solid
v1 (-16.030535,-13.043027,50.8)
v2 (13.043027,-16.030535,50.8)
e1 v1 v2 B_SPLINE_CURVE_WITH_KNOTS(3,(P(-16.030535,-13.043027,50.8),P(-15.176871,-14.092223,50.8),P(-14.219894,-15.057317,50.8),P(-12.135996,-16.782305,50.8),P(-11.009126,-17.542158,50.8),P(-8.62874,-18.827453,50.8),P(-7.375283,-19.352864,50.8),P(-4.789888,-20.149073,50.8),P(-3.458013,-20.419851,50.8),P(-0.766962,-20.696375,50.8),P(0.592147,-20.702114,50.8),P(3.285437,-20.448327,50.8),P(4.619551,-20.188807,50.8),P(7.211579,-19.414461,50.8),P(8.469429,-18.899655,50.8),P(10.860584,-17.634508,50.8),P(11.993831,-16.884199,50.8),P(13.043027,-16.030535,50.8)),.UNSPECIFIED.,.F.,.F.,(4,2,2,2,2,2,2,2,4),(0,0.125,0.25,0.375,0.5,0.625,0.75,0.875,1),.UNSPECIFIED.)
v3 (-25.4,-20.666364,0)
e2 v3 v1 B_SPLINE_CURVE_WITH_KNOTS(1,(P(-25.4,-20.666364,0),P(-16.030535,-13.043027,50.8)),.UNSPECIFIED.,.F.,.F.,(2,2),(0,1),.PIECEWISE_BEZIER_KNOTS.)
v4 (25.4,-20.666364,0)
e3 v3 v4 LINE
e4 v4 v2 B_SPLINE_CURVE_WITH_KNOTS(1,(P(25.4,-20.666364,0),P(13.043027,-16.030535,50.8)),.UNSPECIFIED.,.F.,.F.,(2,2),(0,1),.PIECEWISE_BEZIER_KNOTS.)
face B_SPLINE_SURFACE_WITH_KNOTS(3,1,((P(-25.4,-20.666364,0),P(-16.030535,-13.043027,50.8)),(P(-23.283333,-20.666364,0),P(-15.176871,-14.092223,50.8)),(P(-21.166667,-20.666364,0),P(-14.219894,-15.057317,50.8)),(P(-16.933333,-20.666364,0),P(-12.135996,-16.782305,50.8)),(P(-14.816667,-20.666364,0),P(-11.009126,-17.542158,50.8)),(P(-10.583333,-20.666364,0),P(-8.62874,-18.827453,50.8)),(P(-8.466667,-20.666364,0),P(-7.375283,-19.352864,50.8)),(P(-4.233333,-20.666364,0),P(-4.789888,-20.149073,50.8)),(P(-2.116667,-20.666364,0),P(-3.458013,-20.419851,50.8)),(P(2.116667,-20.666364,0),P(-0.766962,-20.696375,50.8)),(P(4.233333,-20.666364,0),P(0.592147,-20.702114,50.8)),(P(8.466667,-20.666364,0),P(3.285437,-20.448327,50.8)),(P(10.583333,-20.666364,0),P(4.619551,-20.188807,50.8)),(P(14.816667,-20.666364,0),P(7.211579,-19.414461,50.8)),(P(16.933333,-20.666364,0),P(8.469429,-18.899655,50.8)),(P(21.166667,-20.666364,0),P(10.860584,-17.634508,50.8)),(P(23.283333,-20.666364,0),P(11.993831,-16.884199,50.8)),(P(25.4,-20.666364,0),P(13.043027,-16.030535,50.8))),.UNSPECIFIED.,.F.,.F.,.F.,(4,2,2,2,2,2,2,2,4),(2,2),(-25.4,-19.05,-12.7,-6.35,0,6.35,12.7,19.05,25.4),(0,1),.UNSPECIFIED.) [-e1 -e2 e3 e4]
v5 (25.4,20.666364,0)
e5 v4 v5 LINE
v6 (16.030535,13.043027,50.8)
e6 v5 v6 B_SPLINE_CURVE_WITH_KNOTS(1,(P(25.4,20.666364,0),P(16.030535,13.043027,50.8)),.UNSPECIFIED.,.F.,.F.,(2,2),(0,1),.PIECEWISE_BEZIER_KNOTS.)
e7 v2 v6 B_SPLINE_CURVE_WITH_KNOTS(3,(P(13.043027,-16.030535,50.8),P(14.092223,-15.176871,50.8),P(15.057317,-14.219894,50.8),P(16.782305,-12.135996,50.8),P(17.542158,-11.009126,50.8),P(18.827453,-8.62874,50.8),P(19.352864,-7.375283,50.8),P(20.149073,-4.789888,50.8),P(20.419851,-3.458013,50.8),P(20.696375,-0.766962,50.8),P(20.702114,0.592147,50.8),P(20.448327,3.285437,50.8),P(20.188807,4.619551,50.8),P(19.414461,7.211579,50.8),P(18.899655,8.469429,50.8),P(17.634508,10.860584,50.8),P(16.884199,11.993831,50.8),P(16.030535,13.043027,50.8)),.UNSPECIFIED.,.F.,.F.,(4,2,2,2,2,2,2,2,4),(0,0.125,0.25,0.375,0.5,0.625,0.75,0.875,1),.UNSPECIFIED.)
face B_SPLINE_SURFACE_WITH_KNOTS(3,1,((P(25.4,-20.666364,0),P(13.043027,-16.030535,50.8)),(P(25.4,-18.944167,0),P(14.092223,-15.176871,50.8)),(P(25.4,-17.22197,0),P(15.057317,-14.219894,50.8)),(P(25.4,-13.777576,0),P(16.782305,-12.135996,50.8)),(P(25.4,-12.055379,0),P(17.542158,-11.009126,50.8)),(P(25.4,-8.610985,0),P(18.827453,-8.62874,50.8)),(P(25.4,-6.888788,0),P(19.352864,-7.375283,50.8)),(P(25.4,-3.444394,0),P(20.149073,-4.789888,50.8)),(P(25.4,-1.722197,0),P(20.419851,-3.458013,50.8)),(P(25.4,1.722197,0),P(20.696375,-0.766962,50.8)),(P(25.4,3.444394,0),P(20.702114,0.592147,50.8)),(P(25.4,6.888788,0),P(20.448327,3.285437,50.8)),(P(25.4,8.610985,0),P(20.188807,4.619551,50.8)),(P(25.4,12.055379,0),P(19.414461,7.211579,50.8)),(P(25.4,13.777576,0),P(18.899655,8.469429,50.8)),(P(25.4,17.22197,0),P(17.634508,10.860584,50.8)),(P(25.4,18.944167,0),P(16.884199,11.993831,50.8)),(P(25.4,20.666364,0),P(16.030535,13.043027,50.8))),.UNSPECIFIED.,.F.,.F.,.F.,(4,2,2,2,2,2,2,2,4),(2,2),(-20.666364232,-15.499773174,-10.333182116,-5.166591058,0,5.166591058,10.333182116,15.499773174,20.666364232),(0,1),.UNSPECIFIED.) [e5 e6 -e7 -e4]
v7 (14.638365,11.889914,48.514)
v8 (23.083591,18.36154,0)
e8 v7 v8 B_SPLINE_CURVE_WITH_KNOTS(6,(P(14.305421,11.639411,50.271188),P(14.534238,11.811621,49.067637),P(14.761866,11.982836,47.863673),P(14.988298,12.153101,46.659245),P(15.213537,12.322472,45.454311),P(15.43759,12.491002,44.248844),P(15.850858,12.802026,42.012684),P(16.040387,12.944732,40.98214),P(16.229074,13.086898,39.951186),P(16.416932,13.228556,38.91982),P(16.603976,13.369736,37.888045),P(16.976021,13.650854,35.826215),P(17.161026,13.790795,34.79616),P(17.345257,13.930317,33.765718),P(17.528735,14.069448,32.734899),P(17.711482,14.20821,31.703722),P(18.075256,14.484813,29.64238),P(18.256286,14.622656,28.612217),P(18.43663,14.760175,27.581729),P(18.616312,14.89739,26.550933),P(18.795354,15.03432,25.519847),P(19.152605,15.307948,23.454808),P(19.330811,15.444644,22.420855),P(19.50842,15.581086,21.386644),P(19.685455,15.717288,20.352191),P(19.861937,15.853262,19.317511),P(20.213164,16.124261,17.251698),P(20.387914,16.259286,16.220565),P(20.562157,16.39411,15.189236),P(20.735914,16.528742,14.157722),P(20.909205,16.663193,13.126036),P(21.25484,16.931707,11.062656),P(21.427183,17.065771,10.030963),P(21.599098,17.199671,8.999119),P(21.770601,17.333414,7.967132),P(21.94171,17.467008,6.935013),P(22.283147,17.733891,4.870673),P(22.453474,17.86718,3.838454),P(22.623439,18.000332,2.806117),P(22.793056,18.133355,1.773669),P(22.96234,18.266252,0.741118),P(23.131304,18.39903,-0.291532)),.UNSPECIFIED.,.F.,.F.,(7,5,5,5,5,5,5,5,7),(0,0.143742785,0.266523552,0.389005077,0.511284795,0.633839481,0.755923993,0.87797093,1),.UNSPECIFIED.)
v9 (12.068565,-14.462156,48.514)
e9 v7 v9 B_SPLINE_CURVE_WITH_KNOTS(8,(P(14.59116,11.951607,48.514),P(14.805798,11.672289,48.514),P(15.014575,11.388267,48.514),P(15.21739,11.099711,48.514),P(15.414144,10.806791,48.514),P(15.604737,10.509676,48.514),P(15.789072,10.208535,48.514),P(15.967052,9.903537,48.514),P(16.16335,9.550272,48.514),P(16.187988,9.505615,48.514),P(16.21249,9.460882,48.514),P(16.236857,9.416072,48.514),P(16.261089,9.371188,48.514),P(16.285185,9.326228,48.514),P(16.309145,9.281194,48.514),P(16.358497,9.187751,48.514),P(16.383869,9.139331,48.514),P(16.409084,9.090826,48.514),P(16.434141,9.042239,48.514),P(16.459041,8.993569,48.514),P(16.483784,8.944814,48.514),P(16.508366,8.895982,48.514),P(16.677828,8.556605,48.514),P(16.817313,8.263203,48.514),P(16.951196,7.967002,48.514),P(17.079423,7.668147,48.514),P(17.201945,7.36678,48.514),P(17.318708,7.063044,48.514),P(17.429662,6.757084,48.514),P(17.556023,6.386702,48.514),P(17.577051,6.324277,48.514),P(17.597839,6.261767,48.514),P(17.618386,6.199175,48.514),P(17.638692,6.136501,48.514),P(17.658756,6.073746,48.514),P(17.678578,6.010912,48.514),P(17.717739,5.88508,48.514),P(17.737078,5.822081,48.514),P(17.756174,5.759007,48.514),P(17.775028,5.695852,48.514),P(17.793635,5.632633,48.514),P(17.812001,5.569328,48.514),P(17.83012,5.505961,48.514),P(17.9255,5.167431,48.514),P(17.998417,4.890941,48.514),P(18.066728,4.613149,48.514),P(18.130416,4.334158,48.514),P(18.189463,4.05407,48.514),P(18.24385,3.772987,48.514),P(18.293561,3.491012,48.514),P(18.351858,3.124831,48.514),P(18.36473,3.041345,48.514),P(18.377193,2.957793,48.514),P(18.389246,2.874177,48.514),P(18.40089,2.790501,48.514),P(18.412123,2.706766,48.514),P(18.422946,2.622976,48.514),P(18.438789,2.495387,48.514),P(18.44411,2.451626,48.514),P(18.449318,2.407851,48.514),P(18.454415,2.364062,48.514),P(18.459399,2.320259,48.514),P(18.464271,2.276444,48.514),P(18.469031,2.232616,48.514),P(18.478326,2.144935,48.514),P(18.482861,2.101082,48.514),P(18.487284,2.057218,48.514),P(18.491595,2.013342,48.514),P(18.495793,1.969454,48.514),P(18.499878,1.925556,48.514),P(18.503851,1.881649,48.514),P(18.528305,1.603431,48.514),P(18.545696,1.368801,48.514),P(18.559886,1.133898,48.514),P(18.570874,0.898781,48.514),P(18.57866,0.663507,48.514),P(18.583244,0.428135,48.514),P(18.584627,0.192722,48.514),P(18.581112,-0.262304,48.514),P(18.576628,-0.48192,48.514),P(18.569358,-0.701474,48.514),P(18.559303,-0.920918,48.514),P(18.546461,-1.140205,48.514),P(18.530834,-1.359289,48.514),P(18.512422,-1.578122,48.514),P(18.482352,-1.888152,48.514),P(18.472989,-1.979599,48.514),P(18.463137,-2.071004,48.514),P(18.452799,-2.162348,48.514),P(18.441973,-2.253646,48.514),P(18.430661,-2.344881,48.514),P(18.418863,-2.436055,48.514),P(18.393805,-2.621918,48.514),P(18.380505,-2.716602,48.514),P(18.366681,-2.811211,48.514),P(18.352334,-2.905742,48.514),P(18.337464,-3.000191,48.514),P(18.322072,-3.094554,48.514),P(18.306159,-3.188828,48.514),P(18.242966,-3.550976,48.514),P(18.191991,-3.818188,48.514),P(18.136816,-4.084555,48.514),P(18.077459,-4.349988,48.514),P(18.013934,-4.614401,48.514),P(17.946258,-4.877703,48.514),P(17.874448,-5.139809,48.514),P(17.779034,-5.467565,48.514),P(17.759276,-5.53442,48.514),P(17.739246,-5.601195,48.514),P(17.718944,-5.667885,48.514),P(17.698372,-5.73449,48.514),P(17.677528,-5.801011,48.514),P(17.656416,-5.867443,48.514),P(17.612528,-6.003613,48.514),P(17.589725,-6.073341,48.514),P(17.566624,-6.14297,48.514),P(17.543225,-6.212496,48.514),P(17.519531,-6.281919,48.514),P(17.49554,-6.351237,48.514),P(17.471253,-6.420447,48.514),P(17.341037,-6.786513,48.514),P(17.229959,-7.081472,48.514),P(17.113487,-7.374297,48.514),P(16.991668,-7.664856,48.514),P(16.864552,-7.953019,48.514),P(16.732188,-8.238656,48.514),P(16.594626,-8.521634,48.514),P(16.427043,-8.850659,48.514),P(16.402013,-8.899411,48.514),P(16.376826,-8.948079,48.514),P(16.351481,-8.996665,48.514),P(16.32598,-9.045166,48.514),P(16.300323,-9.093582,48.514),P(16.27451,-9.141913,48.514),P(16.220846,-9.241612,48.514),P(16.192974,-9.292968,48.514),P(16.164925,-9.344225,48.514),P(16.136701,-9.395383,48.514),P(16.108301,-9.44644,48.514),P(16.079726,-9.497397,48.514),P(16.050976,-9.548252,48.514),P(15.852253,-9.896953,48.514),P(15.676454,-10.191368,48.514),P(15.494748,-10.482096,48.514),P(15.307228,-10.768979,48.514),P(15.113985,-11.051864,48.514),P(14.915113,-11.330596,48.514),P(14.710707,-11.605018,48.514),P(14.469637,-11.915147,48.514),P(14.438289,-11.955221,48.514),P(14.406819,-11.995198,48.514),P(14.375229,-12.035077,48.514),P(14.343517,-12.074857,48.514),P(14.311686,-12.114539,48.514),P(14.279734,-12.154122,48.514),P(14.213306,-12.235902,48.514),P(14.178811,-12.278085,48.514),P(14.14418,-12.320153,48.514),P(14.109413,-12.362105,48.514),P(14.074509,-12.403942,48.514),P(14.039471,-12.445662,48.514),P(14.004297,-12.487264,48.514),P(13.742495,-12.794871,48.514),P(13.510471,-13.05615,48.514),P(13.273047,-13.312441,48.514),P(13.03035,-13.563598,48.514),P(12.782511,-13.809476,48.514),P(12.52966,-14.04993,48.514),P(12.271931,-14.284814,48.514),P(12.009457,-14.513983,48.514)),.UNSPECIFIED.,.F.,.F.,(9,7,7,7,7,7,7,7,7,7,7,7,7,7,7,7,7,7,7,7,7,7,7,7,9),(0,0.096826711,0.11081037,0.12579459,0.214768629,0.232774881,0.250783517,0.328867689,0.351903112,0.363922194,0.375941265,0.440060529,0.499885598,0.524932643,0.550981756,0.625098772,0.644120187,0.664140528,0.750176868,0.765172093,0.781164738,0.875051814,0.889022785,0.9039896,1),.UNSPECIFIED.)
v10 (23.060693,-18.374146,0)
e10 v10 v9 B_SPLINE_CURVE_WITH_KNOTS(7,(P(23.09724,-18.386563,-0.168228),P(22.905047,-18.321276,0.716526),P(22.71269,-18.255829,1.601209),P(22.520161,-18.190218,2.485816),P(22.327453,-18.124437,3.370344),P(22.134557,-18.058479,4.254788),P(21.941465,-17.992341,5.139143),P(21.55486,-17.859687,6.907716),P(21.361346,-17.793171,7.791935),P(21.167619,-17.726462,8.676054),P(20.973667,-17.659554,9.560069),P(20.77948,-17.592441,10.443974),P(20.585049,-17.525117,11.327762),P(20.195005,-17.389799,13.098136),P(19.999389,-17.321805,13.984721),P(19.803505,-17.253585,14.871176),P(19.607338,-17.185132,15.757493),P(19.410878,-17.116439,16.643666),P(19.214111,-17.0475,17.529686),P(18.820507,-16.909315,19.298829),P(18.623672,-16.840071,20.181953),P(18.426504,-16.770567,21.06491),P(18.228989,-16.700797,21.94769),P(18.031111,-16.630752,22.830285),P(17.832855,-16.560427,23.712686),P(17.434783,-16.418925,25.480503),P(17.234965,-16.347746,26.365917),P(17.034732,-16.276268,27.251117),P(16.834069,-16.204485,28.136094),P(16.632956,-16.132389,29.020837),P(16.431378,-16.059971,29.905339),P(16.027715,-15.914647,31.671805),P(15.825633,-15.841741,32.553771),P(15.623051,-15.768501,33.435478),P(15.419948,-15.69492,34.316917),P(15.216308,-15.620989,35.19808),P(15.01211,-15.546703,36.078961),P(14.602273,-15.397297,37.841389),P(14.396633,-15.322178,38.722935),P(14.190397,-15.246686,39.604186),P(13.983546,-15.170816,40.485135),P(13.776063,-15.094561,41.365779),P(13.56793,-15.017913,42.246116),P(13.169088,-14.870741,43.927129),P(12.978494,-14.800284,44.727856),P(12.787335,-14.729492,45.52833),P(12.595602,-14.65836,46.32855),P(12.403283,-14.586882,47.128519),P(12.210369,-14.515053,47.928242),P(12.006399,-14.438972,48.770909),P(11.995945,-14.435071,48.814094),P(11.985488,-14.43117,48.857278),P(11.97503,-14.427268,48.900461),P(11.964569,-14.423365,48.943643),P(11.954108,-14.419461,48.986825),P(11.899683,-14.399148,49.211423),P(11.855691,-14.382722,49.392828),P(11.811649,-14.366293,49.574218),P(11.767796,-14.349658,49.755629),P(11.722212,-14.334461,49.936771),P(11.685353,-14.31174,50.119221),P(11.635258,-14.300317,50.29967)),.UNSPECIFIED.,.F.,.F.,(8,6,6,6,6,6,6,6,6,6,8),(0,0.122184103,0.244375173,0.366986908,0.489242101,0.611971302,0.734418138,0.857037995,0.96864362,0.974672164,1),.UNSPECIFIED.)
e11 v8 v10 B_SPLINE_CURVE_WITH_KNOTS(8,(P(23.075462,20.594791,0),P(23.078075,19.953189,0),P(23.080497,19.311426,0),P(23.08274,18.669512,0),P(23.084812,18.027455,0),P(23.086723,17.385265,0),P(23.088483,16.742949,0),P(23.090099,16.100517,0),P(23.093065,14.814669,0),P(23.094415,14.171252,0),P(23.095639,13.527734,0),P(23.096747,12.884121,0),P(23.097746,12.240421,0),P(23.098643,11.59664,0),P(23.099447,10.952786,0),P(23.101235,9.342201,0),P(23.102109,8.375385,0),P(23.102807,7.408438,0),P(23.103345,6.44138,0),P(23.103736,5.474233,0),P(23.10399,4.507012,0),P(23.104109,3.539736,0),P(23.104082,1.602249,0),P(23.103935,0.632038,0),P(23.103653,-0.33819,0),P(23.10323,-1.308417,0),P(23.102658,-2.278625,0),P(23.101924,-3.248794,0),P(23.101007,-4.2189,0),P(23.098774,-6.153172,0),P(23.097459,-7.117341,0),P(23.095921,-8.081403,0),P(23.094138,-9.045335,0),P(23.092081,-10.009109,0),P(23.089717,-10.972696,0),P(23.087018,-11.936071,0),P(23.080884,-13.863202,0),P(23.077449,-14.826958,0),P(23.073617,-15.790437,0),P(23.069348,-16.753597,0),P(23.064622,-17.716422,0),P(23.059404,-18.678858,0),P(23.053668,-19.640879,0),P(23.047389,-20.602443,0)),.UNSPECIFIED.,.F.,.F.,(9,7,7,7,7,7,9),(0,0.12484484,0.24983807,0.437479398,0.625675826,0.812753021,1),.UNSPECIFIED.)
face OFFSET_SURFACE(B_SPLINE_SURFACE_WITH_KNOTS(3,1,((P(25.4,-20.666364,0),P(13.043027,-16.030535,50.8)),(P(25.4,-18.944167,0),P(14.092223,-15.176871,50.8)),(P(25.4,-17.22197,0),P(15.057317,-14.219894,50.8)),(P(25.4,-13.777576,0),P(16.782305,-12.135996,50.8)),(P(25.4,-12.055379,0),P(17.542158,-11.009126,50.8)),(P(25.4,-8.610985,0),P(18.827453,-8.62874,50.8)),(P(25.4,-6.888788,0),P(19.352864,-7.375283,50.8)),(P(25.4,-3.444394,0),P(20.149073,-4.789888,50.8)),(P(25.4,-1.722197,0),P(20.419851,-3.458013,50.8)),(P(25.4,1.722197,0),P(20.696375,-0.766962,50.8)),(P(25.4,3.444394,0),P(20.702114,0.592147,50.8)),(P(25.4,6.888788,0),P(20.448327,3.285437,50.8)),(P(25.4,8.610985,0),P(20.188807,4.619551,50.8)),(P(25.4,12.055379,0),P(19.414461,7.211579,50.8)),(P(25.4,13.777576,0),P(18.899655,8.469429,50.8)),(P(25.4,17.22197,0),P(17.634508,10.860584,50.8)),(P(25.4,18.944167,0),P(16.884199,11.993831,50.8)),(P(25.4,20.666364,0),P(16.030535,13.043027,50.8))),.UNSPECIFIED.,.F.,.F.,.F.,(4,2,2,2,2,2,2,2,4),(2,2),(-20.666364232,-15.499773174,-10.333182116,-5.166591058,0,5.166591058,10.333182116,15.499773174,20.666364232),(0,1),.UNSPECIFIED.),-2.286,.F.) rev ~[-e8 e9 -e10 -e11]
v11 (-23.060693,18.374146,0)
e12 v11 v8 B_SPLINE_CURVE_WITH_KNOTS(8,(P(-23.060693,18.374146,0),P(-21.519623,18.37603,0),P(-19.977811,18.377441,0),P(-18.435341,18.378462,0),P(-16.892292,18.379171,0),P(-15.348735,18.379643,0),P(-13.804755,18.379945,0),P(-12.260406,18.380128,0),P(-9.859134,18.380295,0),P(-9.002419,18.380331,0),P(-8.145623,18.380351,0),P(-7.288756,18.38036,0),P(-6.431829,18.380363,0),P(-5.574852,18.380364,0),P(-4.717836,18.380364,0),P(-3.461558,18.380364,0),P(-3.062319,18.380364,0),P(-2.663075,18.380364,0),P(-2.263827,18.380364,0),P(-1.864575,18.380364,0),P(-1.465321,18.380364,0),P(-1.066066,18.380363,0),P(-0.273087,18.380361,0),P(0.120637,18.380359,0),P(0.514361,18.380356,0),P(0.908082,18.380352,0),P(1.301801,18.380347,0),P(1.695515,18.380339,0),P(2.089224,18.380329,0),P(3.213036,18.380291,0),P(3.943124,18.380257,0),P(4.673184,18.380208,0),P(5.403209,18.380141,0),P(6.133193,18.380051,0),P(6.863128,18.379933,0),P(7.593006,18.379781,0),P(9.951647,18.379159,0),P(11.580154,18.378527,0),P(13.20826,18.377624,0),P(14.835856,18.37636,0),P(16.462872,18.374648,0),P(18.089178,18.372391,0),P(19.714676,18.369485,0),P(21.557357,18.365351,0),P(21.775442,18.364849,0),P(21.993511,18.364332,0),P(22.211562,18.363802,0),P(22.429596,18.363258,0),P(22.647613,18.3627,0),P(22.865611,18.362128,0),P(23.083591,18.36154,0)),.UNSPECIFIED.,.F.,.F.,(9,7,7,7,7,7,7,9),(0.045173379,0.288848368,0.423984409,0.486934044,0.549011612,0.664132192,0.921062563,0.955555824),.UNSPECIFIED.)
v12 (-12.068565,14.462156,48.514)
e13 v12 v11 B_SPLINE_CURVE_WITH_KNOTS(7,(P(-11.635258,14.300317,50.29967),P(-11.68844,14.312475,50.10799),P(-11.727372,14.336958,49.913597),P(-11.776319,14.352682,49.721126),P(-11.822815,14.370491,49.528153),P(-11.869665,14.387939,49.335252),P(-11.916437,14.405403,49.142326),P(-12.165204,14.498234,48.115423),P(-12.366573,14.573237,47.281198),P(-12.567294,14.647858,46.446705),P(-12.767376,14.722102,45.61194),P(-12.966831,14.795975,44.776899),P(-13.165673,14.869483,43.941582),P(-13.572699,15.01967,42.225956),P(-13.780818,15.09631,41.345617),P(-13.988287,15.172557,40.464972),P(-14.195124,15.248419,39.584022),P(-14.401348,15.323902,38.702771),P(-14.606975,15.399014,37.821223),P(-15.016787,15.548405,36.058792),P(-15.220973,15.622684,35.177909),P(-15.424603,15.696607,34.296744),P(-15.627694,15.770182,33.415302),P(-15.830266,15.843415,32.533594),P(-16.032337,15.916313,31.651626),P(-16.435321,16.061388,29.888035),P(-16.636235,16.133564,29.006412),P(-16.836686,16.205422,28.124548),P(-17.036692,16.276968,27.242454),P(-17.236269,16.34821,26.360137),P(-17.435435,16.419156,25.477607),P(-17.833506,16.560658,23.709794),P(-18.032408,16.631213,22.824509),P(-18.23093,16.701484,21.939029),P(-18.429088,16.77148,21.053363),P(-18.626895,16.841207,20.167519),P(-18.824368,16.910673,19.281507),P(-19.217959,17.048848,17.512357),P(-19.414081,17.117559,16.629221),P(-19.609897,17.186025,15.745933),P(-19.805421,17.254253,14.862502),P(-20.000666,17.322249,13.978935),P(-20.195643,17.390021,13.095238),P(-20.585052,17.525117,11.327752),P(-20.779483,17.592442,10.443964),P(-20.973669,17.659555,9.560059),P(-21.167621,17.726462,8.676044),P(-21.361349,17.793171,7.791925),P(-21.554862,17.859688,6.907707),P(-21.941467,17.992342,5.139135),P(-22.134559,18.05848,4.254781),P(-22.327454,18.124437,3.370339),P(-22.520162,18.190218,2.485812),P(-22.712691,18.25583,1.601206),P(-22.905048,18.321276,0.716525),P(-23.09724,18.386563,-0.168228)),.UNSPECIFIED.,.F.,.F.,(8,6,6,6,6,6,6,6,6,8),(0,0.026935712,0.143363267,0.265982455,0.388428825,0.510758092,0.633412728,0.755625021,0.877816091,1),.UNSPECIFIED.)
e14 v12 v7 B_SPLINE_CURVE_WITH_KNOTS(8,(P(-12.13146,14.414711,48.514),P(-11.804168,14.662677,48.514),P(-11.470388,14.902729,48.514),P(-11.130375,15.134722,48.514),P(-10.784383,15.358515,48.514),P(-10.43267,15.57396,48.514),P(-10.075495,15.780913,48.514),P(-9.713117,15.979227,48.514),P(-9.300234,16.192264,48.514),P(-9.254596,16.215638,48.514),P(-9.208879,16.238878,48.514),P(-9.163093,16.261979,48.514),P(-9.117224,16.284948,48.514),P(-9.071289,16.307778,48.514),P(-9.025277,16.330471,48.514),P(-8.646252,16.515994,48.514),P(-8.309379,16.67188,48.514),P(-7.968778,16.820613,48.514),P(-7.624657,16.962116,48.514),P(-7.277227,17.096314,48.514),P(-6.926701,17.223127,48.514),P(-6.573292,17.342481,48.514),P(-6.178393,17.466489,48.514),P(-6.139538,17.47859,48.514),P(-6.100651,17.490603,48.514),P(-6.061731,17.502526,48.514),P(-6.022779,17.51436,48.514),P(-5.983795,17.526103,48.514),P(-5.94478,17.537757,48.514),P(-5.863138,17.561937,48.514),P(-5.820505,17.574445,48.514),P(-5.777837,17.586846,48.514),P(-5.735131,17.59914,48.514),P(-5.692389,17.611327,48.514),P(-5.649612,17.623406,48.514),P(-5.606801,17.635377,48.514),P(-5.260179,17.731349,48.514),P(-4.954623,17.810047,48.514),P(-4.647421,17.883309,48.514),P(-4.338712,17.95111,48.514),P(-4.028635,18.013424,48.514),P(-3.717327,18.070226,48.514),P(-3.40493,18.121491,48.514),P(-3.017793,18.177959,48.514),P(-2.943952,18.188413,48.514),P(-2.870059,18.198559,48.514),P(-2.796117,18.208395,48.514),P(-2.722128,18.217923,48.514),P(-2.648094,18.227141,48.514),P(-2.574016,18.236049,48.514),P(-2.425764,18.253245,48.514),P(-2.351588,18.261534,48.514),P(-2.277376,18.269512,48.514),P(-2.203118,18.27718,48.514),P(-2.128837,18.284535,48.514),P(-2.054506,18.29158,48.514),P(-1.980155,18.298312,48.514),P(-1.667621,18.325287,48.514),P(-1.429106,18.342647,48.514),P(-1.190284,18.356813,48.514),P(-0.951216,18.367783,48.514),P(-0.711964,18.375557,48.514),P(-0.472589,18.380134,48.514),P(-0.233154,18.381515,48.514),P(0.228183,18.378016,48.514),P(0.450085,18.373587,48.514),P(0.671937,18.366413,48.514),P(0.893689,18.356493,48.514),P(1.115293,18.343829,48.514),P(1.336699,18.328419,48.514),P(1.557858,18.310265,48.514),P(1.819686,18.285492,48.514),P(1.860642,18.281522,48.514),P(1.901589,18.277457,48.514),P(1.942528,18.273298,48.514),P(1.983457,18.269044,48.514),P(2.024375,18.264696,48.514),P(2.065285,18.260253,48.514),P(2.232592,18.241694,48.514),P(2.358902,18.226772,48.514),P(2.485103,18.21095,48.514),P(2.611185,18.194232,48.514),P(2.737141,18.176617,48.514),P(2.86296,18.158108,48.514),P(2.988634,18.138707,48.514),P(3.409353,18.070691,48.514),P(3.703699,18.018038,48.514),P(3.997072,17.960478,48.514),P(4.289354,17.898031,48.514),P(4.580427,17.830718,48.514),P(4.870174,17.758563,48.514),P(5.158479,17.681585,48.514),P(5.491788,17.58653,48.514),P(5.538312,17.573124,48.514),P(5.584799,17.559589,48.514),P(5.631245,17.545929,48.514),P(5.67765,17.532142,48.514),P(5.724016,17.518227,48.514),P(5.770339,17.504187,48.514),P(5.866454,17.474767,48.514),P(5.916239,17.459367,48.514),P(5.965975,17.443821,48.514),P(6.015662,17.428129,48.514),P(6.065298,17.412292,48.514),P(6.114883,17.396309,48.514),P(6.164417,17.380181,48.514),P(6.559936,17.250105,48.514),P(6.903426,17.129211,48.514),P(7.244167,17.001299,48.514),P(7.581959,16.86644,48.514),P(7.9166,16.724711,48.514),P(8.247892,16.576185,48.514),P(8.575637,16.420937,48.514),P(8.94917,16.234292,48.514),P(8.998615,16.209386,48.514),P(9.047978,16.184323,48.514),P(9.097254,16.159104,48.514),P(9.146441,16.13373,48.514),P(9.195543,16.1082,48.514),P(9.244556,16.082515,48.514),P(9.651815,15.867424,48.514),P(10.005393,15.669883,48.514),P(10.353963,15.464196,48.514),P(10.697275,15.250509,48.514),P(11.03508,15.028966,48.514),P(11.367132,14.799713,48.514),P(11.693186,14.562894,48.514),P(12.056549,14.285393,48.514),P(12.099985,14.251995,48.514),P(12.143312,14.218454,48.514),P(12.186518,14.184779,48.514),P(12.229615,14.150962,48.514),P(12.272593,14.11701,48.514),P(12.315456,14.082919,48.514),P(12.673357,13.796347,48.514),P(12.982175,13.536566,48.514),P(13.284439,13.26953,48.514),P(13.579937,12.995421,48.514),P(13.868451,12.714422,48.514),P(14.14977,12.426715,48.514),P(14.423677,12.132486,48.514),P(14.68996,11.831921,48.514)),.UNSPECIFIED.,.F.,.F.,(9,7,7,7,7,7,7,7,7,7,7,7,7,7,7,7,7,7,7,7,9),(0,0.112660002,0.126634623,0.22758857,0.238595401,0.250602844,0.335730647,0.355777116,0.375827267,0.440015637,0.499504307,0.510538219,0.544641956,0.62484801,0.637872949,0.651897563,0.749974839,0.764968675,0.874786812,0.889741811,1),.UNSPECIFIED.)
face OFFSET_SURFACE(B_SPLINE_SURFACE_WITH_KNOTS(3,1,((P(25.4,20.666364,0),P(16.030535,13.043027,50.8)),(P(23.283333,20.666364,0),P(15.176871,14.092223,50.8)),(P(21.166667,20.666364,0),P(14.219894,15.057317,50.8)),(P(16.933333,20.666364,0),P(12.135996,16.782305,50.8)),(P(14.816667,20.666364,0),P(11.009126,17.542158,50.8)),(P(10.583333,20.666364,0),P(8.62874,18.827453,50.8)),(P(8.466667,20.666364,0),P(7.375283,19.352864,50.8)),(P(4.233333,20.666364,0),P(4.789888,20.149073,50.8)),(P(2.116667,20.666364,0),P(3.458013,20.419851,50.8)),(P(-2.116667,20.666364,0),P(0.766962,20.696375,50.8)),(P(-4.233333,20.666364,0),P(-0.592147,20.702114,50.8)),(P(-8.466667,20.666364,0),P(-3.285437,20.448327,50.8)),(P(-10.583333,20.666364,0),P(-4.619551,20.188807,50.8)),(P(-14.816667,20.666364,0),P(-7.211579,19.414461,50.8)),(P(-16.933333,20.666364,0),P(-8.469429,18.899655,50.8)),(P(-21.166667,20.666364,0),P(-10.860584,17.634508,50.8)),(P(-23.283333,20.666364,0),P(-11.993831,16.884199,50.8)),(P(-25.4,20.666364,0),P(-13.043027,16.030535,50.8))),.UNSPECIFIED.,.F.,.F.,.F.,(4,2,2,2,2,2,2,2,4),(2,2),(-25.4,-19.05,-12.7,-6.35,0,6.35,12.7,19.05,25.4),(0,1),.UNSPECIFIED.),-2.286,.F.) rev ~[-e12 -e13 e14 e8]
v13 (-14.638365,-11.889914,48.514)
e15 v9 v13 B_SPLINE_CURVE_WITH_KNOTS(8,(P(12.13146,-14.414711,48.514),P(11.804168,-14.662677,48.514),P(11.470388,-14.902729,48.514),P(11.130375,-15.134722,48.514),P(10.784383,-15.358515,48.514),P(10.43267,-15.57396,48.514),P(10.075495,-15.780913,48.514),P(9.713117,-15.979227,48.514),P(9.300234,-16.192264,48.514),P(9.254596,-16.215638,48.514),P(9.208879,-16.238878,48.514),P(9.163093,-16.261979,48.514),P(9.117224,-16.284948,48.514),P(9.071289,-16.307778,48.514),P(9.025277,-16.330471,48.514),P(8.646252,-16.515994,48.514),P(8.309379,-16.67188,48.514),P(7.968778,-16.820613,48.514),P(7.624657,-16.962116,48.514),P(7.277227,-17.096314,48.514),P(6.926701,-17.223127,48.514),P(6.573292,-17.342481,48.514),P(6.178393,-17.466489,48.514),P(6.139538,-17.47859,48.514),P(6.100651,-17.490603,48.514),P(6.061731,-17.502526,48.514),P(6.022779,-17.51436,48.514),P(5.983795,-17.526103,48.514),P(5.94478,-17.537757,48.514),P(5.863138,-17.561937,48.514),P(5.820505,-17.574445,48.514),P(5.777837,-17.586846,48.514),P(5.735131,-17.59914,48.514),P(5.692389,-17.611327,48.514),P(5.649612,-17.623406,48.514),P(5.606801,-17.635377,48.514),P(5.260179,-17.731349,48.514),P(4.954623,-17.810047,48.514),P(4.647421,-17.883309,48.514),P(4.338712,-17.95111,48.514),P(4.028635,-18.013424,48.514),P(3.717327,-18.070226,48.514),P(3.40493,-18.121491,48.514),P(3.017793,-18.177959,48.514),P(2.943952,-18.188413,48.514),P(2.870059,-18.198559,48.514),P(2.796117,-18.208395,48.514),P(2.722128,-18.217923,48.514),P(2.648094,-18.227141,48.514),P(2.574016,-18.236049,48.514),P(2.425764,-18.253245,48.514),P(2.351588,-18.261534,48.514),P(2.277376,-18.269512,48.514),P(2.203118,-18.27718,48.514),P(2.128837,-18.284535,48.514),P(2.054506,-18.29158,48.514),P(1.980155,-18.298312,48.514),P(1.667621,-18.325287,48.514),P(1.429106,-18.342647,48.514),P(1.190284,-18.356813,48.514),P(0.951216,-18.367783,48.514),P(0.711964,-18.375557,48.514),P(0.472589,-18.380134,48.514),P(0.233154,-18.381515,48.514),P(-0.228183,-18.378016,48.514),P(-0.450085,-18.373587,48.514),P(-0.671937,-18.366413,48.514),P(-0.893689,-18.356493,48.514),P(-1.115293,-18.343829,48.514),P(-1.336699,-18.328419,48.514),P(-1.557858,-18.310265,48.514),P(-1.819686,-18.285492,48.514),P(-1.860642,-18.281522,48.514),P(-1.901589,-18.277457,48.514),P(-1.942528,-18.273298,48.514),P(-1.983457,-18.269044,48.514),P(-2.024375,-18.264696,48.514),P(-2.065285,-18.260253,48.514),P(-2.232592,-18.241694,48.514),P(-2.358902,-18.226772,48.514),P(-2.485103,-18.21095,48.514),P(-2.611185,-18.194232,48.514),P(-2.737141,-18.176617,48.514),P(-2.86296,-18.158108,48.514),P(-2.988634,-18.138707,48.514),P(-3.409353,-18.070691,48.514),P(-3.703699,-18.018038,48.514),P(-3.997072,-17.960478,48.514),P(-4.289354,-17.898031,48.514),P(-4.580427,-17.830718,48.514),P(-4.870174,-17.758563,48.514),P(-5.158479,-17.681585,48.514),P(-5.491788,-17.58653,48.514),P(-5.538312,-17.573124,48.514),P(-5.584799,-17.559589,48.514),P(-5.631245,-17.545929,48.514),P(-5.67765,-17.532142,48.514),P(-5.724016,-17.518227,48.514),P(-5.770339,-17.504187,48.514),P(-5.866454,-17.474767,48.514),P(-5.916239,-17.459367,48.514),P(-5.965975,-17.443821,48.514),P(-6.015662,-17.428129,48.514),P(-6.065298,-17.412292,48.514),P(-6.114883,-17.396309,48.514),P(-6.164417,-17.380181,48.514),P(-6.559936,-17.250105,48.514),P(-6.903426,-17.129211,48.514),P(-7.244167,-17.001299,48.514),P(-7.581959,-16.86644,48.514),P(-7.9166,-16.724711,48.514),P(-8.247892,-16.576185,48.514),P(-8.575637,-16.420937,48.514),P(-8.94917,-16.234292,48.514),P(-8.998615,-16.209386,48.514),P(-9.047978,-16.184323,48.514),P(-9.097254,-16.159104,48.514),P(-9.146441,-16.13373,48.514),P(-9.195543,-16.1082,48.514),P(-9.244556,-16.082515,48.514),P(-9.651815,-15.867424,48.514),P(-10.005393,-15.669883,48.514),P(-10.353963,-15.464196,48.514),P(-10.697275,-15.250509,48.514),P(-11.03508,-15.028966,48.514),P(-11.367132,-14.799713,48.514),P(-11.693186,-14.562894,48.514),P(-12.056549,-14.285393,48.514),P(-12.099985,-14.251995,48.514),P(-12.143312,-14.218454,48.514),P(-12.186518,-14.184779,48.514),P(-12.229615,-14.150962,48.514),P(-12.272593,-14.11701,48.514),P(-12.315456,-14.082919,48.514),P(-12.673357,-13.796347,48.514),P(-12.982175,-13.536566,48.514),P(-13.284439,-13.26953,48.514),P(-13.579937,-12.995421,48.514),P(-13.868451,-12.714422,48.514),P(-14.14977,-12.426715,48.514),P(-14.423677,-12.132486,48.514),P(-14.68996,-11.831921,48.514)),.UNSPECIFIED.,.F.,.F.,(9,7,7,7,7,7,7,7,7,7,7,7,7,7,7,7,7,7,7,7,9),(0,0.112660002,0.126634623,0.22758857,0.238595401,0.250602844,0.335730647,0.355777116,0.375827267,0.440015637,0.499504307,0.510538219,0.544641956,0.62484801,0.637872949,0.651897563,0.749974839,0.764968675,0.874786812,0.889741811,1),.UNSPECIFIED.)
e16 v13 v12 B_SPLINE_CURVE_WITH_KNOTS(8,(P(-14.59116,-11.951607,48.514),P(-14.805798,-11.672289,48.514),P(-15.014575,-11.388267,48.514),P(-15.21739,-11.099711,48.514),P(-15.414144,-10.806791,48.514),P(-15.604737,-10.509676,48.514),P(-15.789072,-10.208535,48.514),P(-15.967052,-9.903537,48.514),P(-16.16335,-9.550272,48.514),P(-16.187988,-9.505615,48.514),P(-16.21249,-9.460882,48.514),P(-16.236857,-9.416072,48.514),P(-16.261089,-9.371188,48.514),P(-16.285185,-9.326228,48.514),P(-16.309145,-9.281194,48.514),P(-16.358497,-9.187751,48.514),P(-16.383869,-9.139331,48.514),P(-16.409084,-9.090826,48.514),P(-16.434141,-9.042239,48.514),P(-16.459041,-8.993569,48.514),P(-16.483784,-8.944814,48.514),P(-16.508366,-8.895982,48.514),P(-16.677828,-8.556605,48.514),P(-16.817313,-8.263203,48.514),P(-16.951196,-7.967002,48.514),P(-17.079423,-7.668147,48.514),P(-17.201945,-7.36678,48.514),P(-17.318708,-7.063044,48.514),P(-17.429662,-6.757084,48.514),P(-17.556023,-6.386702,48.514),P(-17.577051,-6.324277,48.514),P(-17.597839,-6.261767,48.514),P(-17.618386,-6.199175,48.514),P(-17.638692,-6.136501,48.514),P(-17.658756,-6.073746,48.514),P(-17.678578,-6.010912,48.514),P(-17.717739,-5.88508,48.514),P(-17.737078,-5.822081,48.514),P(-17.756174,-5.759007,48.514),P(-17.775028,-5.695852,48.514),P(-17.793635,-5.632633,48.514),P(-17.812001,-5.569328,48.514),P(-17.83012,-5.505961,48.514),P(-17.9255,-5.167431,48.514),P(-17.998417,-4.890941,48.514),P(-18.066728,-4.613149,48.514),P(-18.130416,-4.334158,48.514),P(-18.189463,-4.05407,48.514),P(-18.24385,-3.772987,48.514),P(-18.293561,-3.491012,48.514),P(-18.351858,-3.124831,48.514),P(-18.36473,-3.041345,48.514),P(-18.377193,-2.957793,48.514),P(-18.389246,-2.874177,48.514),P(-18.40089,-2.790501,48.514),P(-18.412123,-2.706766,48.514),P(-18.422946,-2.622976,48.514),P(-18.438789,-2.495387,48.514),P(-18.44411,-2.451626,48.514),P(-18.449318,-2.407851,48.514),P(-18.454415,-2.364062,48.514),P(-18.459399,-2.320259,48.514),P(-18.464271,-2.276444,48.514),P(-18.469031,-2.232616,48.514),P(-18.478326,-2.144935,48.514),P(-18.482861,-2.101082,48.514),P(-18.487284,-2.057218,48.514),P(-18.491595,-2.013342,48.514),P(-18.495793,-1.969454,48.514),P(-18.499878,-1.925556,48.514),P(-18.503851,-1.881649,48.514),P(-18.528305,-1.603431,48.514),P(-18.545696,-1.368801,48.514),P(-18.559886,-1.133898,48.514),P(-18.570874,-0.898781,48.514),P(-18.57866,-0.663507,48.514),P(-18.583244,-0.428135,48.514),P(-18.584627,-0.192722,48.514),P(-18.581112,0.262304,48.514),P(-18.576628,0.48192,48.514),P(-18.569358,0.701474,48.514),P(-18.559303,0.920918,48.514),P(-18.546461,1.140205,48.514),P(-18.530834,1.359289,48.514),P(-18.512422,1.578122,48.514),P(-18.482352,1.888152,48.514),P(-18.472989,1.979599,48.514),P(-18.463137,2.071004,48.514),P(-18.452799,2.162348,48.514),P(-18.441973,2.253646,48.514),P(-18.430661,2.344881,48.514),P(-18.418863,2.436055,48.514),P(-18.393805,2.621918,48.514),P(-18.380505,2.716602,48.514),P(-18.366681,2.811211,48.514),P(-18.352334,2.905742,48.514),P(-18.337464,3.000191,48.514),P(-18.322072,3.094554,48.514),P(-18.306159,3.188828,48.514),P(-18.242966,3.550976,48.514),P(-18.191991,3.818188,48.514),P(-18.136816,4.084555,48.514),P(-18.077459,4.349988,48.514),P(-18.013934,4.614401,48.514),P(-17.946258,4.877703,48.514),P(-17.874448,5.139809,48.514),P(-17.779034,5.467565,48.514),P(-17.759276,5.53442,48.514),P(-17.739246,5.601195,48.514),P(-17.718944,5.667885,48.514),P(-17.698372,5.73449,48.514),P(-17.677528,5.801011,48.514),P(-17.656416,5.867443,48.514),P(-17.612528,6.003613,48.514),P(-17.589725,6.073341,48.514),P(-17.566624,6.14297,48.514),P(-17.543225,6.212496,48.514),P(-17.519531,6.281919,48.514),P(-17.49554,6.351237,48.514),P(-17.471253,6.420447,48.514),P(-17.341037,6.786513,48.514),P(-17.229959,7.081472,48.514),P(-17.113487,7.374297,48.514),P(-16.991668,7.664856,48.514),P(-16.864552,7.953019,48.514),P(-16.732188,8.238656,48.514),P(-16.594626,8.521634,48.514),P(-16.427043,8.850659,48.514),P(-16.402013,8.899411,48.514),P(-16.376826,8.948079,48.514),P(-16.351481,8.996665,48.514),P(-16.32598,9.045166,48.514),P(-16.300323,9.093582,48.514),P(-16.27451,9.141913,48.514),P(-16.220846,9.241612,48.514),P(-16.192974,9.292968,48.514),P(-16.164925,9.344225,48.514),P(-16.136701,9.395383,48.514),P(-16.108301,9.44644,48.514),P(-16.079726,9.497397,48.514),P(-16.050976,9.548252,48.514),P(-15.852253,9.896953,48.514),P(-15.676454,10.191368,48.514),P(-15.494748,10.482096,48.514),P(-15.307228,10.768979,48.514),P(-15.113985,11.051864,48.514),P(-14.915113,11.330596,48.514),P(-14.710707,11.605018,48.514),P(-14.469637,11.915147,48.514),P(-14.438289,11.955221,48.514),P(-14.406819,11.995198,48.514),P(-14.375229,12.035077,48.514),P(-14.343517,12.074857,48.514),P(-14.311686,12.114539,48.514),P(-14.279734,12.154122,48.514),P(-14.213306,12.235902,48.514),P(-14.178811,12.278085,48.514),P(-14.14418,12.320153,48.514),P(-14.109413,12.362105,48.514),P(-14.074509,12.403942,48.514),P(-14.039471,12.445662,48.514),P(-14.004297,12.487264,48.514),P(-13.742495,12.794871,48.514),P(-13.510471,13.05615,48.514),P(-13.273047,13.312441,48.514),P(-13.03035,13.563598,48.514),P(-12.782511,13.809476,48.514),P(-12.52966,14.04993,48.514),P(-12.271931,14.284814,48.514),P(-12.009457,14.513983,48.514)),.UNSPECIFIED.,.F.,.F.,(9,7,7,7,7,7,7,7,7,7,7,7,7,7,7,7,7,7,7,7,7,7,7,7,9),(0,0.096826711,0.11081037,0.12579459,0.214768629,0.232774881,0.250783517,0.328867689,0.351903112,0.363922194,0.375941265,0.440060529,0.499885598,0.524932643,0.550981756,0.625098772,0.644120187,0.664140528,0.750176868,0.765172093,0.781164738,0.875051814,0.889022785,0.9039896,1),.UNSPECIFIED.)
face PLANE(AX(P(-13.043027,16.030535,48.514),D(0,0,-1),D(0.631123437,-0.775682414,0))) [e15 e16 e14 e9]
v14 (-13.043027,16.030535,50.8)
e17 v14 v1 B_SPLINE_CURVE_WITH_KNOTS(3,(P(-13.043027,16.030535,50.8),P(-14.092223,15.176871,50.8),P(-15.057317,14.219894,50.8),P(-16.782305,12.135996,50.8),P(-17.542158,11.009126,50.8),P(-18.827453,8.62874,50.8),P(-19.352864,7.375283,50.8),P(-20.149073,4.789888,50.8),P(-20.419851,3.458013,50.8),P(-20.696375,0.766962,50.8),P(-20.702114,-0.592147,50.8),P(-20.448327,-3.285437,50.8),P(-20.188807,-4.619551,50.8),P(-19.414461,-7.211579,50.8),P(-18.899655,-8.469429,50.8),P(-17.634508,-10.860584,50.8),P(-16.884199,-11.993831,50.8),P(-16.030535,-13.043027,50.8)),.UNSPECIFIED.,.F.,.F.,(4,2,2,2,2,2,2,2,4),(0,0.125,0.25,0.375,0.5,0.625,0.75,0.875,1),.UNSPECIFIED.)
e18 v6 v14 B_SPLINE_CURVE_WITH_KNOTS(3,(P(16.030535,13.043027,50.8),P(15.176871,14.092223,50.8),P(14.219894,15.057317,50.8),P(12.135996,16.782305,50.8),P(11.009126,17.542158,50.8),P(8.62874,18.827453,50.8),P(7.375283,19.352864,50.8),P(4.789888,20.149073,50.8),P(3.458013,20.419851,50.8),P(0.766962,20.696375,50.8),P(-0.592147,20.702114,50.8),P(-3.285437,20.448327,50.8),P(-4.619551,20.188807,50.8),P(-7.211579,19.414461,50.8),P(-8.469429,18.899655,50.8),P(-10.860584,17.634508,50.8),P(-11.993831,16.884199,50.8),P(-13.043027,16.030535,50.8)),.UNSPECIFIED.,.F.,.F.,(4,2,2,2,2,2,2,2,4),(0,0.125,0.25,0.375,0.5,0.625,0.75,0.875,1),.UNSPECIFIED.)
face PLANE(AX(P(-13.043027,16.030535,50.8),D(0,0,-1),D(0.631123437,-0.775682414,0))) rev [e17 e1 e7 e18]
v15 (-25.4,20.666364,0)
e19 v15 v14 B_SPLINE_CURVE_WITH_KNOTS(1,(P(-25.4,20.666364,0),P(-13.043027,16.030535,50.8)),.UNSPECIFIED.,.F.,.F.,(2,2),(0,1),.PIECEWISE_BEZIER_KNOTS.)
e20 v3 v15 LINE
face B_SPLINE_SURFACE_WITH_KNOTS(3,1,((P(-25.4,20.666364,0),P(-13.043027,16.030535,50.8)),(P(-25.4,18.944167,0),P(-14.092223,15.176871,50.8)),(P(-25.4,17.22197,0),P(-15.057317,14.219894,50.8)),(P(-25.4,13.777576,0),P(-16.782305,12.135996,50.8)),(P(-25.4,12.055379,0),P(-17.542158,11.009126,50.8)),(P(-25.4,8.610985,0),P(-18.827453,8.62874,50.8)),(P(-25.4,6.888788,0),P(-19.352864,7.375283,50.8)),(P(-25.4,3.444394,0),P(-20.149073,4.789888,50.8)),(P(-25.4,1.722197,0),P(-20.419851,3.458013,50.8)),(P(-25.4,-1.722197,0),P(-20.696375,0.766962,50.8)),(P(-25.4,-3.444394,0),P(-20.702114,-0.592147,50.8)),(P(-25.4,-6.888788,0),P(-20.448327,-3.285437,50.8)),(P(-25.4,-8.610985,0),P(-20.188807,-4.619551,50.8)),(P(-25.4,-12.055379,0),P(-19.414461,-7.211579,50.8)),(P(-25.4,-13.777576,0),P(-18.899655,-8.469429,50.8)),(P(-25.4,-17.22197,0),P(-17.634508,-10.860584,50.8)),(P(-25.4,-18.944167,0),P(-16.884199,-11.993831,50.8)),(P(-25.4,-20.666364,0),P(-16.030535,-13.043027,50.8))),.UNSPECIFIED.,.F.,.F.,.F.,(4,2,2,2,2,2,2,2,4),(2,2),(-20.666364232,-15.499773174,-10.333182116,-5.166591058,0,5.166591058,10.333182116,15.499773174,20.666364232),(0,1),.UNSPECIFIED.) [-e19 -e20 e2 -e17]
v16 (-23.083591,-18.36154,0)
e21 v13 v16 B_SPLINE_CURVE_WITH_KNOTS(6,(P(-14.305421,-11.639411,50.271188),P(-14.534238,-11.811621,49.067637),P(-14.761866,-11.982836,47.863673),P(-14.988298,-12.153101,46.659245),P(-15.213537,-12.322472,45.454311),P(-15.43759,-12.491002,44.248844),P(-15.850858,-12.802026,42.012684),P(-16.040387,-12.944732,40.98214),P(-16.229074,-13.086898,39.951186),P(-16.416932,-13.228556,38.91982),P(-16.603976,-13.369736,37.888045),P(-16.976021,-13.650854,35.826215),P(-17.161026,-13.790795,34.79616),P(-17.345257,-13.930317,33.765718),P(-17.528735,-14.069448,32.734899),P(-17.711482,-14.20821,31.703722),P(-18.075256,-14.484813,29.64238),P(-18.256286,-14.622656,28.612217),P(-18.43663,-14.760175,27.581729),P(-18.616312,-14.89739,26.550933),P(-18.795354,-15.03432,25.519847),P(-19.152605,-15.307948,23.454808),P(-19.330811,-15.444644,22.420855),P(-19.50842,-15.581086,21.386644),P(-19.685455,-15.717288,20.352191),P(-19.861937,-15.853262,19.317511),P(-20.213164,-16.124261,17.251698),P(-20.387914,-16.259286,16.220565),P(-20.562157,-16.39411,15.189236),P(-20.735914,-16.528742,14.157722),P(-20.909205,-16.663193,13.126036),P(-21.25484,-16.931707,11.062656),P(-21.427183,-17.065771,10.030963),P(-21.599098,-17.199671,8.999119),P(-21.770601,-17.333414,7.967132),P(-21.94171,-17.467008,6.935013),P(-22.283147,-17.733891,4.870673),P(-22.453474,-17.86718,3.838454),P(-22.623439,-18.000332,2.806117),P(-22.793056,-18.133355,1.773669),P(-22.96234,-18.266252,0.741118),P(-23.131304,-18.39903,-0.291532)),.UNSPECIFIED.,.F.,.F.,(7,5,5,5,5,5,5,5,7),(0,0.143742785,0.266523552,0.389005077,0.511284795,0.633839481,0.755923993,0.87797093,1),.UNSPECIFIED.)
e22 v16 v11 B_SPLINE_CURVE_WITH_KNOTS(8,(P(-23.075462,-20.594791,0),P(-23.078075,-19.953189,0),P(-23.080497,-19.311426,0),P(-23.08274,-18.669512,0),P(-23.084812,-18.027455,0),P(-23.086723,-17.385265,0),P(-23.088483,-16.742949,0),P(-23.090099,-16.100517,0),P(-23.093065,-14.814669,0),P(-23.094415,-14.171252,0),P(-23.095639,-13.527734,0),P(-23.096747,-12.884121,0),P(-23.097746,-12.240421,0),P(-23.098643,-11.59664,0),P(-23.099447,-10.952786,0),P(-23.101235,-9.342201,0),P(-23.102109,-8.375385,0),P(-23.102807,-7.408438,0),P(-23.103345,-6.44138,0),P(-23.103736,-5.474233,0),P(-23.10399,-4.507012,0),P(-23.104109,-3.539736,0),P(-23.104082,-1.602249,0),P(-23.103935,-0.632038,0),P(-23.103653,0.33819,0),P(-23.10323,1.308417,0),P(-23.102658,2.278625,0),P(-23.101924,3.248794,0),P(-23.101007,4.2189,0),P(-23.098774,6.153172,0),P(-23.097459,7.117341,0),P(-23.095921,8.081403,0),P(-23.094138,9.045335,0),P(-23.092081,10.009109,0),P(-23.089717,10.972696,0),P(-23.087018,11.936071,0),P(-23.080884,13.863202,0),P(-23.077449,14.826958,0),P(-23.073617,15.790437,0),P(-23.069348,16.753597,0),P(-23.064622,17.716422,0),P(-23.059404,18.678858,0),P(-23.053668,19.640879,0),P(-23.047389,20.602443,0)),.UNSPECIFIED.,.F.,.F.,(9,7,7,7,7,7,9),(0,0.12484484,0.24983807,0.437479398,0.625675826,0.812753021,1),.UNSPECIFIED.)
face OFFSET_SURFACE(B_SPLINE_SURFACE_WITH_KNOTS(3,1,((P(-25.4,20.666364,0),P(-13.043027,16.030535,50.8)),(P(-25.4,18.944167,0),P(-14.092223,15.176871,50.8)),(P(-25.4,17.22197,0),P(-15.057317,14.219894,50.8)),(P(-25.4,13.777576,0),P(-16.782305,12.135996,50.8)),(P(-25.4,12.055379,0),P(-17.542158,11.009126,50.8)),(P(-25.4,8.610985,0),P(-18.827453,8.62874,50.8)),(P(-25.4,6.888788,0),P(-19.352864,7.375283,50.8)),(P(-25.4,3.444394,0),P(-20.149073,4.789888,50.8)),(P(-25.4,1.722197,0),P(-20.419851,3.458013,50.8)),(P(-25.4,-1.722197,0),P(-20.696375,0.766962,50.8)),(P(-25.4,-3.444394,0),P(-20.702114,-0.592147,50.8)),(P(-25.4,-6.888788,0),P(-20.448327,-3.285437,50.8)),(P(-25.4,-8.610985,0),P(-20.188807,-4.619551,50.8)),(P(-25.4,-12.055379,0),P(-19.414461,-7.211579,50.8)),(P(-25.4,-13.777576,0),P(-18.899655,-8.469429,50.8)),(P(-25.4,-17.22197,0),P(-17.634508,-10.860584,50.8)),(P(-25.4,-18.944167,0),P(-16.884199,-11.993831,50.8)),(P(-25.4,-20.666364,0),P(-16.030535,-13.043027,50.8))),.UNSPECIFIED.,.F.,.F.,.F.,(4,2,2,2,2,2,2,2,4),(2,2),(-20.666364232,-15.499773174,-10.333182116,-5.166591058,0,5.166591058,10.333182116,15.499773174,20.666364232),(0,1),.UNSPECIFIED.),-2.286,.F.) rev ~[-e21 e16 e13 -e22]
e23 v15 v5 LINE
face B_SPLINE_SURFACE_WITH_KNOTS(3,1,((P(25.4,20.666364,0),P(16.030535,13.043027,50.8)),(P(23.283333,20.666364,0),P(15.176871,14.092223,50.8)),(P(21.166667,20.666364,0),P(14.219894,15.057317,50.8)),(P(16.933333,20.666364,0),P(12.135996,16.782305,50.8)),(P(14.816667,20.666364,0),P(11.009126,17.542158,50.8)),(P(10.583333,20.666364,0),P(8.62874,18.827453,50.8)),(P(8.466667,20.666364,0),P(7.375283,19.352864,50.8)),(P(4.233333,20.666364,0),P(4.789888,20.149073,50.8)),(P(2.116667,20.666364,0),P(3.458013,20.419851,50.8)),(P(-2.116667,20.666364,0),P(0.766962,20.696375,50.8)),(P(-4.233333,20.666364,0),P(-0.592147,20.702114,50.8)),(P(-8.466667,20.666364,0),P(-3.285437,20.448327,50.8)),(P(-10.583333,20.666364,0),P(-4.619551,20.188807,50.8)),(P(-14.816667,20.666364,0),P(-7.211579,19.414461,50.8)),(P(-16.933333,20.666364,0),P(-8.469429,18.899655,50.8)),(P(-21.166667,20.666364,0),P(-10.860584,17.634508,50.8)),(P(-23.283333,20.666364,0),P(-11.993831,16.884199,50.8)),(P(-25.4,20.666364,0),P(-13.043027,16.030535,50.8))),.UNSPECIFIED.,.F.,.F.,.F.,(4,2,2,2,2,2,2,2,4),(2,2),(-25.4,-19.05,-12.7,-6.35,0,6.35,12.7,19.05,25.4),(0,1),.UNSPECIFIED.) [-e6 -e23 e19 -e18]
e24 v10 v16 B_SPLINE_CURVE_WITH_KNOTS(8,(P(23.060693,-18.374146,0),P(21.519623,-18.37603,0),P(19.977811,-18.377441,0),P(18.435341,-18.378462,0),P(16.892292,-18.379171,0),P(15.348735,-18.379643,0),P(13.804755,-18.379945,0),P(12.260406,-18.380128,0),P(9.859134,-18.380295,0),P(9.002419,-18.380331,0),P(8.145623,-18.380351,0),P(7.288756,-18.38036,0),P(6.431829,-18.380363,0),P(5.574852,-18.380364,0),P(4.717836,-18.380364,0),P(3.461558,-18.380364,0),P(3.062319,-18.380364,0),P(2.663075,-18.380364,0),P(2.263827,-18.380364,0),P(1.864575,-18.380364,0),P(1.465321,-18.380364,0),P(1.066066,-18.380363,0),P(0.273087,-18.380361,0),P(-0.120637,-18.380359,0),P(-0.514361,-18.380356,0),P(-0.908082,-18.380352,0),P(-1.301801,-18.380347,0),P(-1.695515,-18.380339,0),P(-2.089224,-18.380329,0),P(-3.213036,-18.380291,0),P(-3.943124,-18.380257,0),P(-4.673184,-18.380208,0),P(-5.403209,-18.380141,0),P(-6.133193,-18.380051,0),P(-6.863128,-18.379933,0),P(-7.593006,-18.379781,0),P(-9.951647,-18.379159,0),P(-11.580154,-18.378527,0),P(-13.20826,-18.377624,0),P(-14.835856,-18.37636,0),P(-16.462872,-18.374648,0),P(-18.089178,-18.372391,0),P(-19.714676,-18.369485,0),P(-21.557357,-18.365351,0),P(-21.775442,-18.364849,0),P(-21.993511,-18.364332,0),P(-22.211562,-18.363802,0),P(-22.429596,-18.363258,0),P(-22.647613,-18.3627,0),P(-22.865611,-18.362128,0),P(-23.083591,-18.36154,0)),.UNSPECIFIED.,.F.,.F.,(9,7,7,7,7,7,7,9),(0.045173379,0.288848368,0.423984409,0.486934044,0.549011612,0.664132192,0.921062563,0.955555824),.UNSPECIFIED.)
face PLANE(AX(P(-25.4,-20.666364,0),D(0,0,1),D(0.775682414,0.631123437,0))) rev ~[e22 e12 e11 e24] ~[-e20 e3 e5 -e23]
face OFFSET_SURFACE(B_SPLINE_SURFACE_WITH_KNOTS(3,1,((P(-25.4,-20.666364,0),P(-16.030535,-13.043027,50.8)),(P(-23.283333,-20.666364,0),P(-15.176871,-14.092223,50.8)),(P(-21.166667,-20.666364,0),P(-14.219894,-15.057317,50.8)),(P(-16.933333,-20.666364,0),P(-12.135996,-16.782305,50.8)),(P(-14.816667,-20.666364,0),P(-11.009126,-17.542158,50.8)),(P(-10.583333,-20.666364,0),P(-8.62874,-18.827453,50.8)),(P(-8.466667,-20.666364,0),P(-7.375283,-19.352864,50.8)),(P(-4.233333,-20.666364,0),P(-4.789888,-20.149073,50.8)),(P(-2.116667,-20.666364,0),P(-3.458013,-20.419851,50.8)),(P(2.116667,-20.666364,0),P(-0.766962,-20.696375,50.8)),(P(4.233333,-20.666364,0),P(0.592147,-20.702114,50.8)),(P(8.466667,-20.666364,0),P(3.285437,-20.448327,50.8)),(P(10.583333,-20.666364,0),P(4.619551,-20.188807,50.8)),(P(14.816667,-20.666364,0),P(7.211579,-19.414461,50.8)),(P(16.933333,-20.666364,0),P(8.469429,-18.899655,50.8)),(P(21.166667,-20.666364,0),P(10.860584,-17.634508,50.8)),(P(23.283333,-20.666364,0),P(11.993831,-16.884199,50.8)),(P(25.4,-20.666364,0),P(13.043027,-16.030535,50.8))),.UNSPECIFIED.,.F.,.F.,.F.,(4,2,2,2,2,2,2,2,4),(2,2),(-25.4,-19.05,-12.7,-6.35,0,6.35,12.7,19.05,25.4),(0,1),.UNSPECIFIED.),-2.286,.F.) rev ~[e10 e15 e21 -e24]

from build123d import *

# Parameters (mm, degrees)
F0_W = 50.8
F0_H = 41.3327284643
F4_T = 2.286


# Not quite as in the source:
# - the arcs of a loft's sections are written as splines that run evenly, so that the points pair up as in the source's solid
# - a shell that OpenCascade refuses in one call is made with other operations: the cavity is built on its own and cut out


with BuildPart() as f3:
    # F0 (on Top) → F3 section 0
    with BuildSketch(Plane.XY):
        Rectangle(F0_W, F0_H)
    # F2 (on offset) → F3 section 1
    with BuildSketch(Plane.XY.offset(50.8)):
        with BuildLine():
            add(Edge.make_bspline(
                [(16.0305352967, 13.0430268219), (15.1768711874, 14.0922229036), (14.2198939474, 15.0573165448), (12.135995559, 16.7823054792), (11.0091259391, 17.5421581187), (8.6287404272, 18.8274534668), (7.3752833949, 19.3528643939), (4.7898876398, 20.1490729763), (3.458012846, 20.4198509437), (0.7669621567, 20.696374911), (-0.5921471973, 20.7021140733), (-3.2854372521, 20.4483267645), (-4.6195513559, 20.1888065689), (-7.2115791497, 19.414460888), (-8.4694287466, 18.8996545501), (-10.8605841049, 17.6345081674), (-11.9938307403, 16.8841994059), (-13.0430268219, 16.0305352967)],
                knots=[0, 0, 0, 0, 0.125, 0.125, 0.25, 0.25, 0.375, 0.375, 0.5, 0.5, 0.625, 0.625, 0.75, 0.75, 0.875, 0.875, 1, 1, 1, 1], degree=3))
            add(Edge.make_bspline(
                [(-13.0430268219, 16.0305352967), (-14.0922229036, 15.1768711874), (-15.0573165448, 14.2198939474), (-16.7823054792, 12.135995559), (-17.5421581187, 11.0091259391), (-18.8274534668, 8.6287404272), (-19.3528643939, 7.3752833949), (-20.1490729763, 4.7898876398), (-20.4198509437, 3.458012846), (-20.696374911, 0.7669621567), (-20.7021140733, -0.5921471973), (-20.4483267645, -3.2854372521), (-20.1888065689, -4.6195513559), (-19.414460888, -7.2115791497), (-18.8996545501, -8.4694287466), (-17.6345081674, -10.8605841049), (-16.8841994059, -11.9938307403), (-16.0305352967, -13.0430268219)],
                knots=[0, 0, 0, 0, 0.125, 0.125, 0.25, 0.25, 0.375, 0.375, 0.5, 0.5, 0.625, 0.625, 0.75, 0.75, 0.875, 0.875, 1, 1, 1, 1], degree=3))
            add(Edge.make_bspline(
                [(-16.0305352967, -13.0430268219), (-15.1768711874, -14.0922229036), (-14.2198939474, -15.0573165448), (-12.135995559, -16.7823054792), (-11.0091259391, -17.5421581187), (-8.6287404272, -18.8274534668), (-7.3752833949, -19.3528643939), (-4.7898876398, -20.1490729763), (-3.458012846, -20.4198509437), (-0.7669621567, -20.696374911), (0.5921471973, -20.7021140733), (3.2854372521, -20.4483267645), (4.6195513559, -20.1888065689), (7.2115791497, -19.414460888), (8.4694287466, -18.8996545501), (10.8605841049, -17.6345081674), (11.9938307403, -16.8841994059), (13.0430268219, -16.0305352967)],
                knots=[0, 0, 0, 0, 0.125, 0.125, 0.25, 0.25, 0.375, 0.375, 0.5, 0.5, 0.625, 0.625, 0.75, 0.75, 0.875, 0.875, 1, 1, 1, 1], degree=3))
            add(Edge.make_bspline(
                [(13.0430268219, -16.0305352967), (14.0922229036, -15.1768711874), (15.0573165448, -14.2198939474), (16.7823054792, -12.135995559), (17.5421581187, -11.0091259391), (18.8274534668, -8.6287404272), (19.3528643939, -7.3752833949), (20.1490729763, -4.7898876398), (20.4198509437, -3.458012846), (20.696374911, -0.7669621567), (20.7021140733, 0.5921471973), (20.4483267645, 3.2854372521), (20.1888065689, 4.6195513559), (19.414460888, 7.2115791497), (18.8996545501, 8.4694287466), (17.6345081674, 10.8605841049), (16.8841994059, 11.9938307403), (16.0305352967, 13.0430268219)],
                knots=[0, 0, 0, 0, 0.125, 0.125, 0.25, 0.25, 0.375, 0.375, 0.5, 0.5, 0.625, 0.625, 0.75, 0.75, 0.875, 0.875, 1, 1, 1, 1], degree=3))
        make_face()
    loft(ruled=True)

    # F4: shell of thickness 2.286, made by hand


with BuildPart() as f4_core1:
    # F4_t2: copy of F3
    add(f3.part)

    # the walls: a layer under each face that stays
    f4_faces = [f4_core1.faces().sort_by_distance(p)[0] for p in [
        (22.9790564637, -1.0562437507, 25.4),
        (1.0562437507, 20.6122385797, 25.4),
        (-22.9790564637, 1.0562437507, 25.4),
        (-1.0562437507, -20.6122385797, 25.4),
        (0, 0, 50.8),
    ]]
    thicken(f4_faces, amount=-F4_T, mode=Mode.SUBTRACT)


with BuildPart() as f3_1:
    add(f3.part)

    # what is left inside the walls is the cavity
    f4_cavity = [f4_core1.part.solids().sort_by_distance(p)[0] for p in [
        (-0.625568, -18.323309, 16.343336),
    ]]
    add(f4_cavity, mode=Mode.SUBTRACT)


solid = f3_1.part
